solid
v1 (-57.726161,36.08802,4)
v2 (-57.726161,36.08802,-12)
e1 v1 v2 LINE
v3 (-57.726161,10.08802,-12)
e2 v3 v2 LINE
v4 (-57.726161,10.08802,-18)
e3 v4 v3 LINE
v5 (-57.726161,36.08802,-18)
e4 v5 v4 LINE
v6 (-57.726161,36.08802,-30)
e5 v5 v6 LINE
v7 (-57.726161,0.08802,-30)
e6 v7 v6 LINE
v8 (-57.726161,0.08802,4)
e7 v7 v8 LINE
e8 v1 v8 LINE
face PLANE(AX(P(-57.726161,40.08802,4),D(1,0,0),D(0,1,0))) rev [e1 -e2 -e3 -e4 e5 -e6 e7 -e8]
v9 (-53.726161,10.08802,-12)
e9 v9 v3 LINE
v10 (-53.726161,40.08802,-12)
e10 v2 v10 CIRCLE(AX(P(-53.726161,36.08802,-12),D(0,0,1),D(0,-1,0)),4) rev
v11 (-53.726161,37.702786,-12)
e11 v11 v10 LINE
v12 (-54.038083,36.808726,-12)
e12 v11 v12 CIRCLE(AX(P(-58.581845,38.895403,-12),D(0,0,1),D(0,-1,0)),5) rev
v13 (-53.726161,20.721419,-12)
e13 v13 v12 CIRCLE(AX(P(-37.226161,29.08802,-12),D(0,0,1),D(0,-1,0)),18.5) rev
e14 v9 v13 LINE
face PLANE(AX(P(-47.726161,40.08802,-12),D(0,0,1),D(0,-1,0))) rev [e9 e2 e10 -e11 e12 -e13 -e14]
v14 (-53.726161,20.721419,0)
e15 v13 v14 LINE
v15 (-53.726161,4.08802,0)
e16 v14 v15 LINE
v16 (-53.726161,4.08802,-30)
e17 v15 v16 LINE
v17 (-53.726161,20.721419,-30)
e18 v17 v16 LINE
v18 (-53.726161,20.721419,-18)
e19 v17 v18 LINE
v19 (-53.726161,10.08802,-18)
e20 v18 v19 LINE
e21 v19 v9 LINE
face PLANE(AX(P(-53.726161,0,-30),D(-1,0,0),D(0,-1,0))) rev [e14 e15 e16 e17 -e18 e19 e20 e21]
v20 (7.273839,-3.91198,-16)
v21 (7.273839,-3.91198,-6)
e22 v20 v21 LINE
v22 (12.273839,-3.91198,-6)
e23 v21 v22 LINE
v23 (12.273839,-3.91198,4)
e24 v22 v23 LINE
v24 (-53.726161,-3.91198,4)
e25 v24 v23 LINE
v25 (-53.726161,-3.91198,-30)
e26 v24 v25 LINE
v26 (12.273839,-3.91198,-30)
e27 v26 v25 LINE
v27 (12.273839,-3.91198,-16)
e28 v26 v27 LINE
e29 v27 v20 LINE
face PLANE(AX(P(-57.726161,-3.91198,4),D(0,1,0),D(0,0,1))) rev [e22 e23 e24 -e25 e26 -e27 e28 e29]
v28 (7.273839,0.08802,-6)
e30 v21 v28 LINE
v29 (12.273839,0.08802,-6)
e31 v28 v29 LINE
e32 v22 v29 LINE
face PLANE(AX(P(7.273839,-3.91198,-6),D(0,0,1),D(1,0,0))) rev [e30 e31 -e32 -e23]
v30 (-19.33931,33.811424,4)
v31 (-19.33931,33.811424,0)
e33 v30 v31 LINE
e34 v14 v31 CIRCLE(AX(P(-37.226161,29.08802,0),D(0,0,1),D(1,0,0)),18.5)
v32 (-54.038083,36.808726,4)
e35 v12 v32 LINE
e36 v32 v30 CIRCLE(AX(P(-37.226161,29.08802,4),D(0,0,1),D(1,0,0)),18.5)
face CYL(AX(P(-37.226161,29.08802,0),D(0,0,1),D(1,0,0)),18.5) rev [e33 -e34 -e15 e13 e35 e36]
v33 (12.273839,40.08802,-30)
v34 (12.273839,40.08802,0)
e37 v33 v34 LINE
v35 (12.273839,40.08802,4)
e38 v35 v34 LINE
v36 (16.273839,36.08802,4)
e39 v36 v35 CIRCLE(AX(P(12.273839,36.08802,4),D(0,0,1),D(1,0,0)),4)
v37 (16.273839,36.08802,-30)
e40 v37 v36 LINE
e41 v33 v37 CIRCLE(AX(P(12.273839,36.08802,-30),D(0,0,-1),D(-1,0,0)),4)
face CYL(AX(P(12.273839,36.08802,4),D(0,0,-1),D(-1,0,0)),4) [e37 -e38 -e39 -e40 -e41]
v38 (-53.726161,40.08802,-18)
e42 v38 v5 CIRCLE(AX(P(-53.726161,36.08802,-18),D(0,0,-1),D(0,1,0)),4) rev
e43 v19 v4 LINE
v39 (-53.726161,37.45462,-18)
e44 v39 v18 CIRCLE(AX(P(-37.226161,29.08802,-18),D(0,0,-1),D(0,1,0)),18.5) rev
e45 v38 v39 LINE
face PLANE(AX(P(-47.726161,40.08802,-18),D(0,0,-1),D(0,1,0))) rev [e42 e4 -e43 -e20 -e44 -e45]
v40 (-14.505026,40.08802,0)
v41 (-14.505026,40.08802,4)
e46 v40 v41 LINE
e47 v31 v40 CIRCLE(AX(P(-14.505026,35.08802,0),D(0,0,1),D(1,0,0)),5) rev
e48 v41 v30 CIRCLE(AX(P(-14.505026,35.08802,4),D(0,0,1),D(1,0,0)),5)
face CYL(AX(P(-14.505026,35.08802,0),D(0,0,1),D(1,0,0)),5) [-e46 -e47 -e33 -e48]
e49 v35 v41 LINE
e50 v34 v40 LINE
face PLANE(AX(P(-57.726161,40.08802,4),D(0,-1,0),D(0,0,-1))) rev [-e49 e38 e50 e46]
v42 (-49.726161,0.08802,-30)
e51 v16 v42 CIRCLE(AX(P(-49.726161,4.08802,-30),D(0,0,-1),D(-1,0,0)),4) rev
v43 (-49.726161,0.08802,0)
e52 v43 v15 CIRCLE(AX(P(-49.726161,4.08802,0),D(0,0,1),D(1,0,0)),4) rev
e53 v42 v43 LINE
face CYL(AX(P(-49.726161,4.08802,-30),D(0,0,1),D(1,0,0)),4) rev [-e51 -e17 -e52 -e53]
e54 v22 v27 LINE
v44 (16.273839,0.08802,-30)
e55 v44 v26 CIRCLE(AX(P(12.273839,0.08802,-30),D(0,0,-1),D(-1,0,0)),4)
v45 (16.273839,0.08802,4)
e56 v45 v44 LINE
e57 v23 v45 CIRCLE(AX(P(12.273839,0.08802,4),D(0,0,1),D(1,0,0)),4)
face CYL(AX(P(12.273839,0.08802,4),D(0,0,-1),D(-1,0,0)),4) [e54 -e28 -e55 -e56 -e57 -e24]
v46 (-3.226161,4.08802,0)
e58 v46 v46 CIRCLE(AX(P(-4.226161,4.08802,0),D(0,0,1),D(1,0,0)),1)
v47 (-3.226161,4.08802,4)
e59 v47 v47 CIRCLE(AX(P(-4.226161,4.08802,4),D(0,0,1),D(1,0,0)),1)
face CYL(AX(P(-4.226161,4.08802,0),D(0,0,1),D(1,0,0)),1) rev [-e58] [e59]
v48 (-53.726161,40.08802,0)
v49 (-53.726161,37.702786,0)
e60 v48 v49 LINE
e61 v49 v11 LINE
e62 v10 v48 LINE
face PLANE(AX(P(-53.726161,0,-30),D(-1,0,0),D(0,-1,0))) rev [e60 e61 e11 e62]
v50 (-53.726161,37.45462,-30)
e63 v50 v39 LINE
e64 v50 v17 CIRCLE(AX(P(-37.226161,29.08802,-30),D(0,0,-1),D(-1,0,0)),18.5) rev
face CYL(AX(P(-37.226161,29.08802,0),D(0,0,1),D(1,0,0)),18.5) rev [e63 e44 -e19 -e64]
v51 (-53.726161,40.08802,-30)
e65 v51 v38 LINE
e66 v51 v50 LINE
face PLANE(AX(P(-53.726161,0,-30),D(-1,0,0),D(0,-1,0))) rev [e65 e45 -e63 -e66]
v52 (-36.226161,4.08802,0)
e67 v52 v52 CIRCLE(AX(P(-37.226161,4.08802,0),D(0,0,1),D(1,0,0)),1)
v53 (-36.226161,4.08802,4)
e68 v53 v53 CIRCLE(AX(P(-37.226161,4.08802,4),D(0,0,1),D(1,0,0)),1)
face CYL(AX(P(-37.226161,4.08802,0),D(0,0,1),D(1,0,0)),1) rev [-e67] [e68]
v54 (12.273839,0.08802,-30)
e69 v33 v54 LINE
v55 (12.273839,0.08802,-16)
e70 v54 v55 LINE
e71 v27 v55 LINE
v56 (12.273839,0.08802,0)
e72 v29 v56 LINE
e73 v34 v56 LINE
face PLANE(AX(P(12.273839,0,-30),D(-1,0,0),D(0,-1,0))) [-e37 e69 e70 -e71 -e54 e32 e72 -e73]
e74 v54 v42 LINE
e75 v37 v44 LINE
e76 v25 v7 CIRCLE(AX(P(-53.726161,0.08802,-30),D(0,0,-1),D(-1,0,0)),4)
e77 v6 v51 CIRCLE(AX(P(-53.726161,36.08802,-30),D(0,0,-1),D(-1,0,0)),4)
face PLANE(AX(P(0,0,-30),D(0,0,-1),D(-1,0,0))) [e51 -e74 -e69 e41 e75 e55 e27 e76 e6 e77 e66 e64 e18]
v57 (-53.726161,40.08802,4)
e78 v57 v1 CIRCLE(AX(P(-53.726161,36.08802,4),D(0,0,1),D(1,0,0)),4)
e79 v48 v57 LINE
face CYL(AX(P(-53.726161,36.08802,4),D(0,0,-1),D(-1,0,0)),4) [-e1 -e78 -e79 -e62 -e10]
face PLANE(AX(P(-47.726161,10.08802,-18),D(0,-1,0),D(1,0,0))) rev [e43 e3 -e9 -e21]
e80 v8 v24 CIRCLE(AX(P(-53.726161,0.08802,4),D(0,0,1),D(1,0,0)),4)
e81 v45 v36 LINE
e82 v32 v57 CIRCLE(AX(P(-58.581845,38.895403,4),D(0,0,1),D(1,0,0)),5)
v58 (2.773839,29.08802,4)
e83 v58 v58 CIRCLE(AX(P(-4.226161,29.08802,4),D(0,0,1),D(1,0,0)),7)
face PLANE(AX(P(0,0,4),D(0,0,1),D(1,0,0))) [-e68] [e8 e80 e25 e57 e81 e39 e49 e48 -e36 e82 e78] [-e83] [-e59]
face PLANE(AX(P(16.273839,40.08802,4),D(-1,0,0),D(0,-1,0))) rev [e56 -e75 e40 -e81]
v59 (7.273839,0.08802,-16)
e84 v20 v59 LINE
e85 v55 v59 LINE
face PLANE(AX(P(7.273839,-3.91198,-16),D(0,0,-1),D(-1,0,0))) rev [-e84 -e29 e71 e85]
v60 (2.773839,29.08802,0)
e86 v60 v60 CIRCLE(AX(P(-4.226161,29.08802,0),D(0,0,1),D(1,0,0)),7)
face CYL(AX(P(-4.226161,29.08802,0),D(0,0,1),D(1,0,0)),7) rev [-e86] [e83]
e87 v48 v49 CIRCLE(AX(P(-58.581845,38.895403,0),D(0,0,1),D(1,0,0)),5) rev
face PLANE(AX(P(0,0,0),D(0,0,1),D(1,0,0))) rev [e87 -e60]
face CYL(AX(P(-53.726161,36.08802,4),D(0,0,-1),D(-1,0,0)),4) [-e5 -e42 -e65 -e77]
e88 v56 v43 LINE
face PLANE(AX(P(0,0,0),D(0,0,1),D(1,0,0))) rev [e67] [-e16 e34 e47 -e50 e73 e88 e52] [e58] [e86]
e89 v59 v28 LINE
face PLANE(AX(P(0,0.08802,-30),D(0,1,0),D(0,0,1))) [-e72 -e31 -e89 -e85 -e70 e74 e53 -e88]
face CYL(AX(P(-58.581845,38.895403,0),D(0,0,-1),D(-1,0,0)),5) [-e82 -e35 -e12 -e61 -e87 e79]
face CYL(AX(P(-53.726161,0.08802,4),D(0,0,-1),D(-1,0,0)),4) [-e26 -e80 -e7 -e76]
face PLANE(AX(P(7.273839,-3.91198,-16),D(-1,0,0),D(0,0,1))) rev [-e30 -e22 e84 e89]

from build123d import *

# Parameters (mm, degrees)
ESQUISSE2_W             = 74
ESQUISSE2_H             = 44
BOSS_EXTRU_1_DEPTH      = 4
ESQUISSE4_R             = 7
ESQUISSE4_R_2           = 18.5
ESQUISSE4_R_3           = 1
ENL_V_MAT_EXTRU_1_DEPTH = 71.394310982
BOSS_EXTRU_2_START      = -4
BOSS_EXTRU_2_DEPTH      = 34
CONG_1_R                = 4
ESQUISSE7_W             = 6
ESQUISSE7_H             = 30
ENL_V_MAT_EXTRU_2_DEPTH = 10
CONG_2_START            = -13
CONG_2_DEPTH            = 18
ESQUISSE8_W             = 5
ESQUISSE8_H             = 10
ENL_V_MAT_EXTRU_3_DEPTH = 77.369560077


with BuildPart() as part:
    # Esquisse2 → Boss.-Extru.1 (new body)
    with BuildSketch(Plane.XY):
        with Locations((-20.726161369, 18.08801956)):
            Rectangle(ESQUISSE2_W, ESQUISSE2_H)
    extrude(amount=BOSS_EXTRU_1_DEPTH)

    # Esquisse4 → Enlèv. mat.-Extru.1 (cut, through all)
    with BuildSketch(Plane.XY.offset(4)):
        with Locations((-4.226161369, 29.08801956)):
            Circle(ESQUISSE4_R)
        with Locations((-37.226161369, 29.08801956)):
            Circle(ESQUISSE4_R_2)
        with Locations((-4.226161369, 4.08801956)):
            Circle(ESQUISSE4_R_3)
        with Locations((-37.226161369, 4.08801956)):
            Circle(ESQUISSE4_R_3)
    extrude(amount=-ENL_V_MAT_EXTRU_1_DEPTH, mode=Mode.SUBTRACT)

    # Boss.-Extru.2: read off the stored shape, not the designer's step
    # Boss.-Extru.2 outline → Boss.-Extru.2 (add)
    with BuildSketch(Plane(origin=(0, 0, 0), x_dir=(-1, 0, 0), z_dir=(0, 0, -1)).offset(BOSS_EXTRU_2_START)):
        with BuildLine():
            Line((-12.273838631, 40.08801956), (-16.273838631, 40.08801956))
            Line((-16.273838631, 40.08801956), (-16.273838631, -3.91198044))
            Line((-16.273838631, -3.91198044), (57.726161369, -3.91198044))
            Line((57.726161369, -3.91198044), (57.726161369, 40.08801956))
            Line((57.726161369, 40.08801956), (53.726161369, 40.08801956))
            Line((53.726161369, 40.08801956), (53.726161369, 37.454619825))
            ThreePointArc((53.726161369, 37.454619825), (55.726161369, 29.08801956), (53.726161369, 20.721419295))
            Line((53.726161369, 20.721419295), (53.726161369, 0.08801956))
            Line((53.726161369, 0.08801956), (-12.273838631, 0.08801956))
            Line((-12.273838631, 0.08801956), (-12.273838631, 40.08801956))
        make_face()
    extrude(amount=BOSS_EXTRU_2_DEPTH)

    # Congé1
    cong_1_edges = [part.edges().sort_by_distance(p)[0] for p in [
        (-53.726161369, 0.08801956, -15),
        (-57.726161369, 40.08801956, -15),
        (16.273838631, 40.08801956, -15),
        (16.273838631, -3.91198044, -15),
        (-57.726161369, -3.91198044, -15),
    ]]
    fillet(cong_1_edges, radius=CONG_1_R - 0.0001)  # a hair under: the kernel refuses the full size

    # Esquisse7 → Enlèv. mat.-Extru.2 (cut)
    with BuildSketch(Plane.ZY.offset(57.726161369)):
        with Locations((-15, 25.08801956)):
            Rectangle(ESQUISSE7_W, ESQUISSE7_H)
    extrude(amount=-ENL_V_MAT_EXTRU_2_DEPTH, mode=Mode.SUBTRACT)

    # Congé2: read off the stored shape, not the designer's step
    # Congé2 outline → Congé2 (cut)
    with BuildSketch(Plane.XY.offset(CONG_2_START)):
        with BuildLine():
            Line((-52.10063615, 40.08801956), (-53.726161369, 40.08801956))
            ThreePointArc((-53.726161369, 40.08801956), (-53.604311661, 38.421947689), (-54.038082686, 36.808725593))
            ThreePointArc((-54.038082686, 36.808725593), (-53.153978754, 38.498366704), (-52.10063615, 40.08801956))
        make_face()
        with BuildLine():
            ThreePointArc((-22.351686589, 40.08801956), (-20.5475812, 37.09270341), (-19.339309991, 33.811423815))
            ThreePointArc((-19.339309991, 33.811423815), (-18.466274294, 38.139004751), (-14.505025834, 40.08801956))
            Line((-14.505025834, 40.08801956), (-22.351686589, 40.08801956))
        make_face()
    extrude(amount=CONG_2_DEPTH, mode=Mode.SUBTRACT)

    # Esquisse8 → Enlèv. mat.-Extru.3 (cut, through all)
    with BuildSketch(Plane(origin=(0, 0.08801956, 0), x_dir=(1, 0, 0), z_dir=(0, 1, 0))):
        with Locations((9.773838631, 11)):
            Rectangle(ESQUISSE8_W, ESQUISSE8_H)
    extrude(amount=-ENL_V_MAT_EXTRU_3_DEPTH, mode=Mode.SUBTRACT)


solid = part.part
